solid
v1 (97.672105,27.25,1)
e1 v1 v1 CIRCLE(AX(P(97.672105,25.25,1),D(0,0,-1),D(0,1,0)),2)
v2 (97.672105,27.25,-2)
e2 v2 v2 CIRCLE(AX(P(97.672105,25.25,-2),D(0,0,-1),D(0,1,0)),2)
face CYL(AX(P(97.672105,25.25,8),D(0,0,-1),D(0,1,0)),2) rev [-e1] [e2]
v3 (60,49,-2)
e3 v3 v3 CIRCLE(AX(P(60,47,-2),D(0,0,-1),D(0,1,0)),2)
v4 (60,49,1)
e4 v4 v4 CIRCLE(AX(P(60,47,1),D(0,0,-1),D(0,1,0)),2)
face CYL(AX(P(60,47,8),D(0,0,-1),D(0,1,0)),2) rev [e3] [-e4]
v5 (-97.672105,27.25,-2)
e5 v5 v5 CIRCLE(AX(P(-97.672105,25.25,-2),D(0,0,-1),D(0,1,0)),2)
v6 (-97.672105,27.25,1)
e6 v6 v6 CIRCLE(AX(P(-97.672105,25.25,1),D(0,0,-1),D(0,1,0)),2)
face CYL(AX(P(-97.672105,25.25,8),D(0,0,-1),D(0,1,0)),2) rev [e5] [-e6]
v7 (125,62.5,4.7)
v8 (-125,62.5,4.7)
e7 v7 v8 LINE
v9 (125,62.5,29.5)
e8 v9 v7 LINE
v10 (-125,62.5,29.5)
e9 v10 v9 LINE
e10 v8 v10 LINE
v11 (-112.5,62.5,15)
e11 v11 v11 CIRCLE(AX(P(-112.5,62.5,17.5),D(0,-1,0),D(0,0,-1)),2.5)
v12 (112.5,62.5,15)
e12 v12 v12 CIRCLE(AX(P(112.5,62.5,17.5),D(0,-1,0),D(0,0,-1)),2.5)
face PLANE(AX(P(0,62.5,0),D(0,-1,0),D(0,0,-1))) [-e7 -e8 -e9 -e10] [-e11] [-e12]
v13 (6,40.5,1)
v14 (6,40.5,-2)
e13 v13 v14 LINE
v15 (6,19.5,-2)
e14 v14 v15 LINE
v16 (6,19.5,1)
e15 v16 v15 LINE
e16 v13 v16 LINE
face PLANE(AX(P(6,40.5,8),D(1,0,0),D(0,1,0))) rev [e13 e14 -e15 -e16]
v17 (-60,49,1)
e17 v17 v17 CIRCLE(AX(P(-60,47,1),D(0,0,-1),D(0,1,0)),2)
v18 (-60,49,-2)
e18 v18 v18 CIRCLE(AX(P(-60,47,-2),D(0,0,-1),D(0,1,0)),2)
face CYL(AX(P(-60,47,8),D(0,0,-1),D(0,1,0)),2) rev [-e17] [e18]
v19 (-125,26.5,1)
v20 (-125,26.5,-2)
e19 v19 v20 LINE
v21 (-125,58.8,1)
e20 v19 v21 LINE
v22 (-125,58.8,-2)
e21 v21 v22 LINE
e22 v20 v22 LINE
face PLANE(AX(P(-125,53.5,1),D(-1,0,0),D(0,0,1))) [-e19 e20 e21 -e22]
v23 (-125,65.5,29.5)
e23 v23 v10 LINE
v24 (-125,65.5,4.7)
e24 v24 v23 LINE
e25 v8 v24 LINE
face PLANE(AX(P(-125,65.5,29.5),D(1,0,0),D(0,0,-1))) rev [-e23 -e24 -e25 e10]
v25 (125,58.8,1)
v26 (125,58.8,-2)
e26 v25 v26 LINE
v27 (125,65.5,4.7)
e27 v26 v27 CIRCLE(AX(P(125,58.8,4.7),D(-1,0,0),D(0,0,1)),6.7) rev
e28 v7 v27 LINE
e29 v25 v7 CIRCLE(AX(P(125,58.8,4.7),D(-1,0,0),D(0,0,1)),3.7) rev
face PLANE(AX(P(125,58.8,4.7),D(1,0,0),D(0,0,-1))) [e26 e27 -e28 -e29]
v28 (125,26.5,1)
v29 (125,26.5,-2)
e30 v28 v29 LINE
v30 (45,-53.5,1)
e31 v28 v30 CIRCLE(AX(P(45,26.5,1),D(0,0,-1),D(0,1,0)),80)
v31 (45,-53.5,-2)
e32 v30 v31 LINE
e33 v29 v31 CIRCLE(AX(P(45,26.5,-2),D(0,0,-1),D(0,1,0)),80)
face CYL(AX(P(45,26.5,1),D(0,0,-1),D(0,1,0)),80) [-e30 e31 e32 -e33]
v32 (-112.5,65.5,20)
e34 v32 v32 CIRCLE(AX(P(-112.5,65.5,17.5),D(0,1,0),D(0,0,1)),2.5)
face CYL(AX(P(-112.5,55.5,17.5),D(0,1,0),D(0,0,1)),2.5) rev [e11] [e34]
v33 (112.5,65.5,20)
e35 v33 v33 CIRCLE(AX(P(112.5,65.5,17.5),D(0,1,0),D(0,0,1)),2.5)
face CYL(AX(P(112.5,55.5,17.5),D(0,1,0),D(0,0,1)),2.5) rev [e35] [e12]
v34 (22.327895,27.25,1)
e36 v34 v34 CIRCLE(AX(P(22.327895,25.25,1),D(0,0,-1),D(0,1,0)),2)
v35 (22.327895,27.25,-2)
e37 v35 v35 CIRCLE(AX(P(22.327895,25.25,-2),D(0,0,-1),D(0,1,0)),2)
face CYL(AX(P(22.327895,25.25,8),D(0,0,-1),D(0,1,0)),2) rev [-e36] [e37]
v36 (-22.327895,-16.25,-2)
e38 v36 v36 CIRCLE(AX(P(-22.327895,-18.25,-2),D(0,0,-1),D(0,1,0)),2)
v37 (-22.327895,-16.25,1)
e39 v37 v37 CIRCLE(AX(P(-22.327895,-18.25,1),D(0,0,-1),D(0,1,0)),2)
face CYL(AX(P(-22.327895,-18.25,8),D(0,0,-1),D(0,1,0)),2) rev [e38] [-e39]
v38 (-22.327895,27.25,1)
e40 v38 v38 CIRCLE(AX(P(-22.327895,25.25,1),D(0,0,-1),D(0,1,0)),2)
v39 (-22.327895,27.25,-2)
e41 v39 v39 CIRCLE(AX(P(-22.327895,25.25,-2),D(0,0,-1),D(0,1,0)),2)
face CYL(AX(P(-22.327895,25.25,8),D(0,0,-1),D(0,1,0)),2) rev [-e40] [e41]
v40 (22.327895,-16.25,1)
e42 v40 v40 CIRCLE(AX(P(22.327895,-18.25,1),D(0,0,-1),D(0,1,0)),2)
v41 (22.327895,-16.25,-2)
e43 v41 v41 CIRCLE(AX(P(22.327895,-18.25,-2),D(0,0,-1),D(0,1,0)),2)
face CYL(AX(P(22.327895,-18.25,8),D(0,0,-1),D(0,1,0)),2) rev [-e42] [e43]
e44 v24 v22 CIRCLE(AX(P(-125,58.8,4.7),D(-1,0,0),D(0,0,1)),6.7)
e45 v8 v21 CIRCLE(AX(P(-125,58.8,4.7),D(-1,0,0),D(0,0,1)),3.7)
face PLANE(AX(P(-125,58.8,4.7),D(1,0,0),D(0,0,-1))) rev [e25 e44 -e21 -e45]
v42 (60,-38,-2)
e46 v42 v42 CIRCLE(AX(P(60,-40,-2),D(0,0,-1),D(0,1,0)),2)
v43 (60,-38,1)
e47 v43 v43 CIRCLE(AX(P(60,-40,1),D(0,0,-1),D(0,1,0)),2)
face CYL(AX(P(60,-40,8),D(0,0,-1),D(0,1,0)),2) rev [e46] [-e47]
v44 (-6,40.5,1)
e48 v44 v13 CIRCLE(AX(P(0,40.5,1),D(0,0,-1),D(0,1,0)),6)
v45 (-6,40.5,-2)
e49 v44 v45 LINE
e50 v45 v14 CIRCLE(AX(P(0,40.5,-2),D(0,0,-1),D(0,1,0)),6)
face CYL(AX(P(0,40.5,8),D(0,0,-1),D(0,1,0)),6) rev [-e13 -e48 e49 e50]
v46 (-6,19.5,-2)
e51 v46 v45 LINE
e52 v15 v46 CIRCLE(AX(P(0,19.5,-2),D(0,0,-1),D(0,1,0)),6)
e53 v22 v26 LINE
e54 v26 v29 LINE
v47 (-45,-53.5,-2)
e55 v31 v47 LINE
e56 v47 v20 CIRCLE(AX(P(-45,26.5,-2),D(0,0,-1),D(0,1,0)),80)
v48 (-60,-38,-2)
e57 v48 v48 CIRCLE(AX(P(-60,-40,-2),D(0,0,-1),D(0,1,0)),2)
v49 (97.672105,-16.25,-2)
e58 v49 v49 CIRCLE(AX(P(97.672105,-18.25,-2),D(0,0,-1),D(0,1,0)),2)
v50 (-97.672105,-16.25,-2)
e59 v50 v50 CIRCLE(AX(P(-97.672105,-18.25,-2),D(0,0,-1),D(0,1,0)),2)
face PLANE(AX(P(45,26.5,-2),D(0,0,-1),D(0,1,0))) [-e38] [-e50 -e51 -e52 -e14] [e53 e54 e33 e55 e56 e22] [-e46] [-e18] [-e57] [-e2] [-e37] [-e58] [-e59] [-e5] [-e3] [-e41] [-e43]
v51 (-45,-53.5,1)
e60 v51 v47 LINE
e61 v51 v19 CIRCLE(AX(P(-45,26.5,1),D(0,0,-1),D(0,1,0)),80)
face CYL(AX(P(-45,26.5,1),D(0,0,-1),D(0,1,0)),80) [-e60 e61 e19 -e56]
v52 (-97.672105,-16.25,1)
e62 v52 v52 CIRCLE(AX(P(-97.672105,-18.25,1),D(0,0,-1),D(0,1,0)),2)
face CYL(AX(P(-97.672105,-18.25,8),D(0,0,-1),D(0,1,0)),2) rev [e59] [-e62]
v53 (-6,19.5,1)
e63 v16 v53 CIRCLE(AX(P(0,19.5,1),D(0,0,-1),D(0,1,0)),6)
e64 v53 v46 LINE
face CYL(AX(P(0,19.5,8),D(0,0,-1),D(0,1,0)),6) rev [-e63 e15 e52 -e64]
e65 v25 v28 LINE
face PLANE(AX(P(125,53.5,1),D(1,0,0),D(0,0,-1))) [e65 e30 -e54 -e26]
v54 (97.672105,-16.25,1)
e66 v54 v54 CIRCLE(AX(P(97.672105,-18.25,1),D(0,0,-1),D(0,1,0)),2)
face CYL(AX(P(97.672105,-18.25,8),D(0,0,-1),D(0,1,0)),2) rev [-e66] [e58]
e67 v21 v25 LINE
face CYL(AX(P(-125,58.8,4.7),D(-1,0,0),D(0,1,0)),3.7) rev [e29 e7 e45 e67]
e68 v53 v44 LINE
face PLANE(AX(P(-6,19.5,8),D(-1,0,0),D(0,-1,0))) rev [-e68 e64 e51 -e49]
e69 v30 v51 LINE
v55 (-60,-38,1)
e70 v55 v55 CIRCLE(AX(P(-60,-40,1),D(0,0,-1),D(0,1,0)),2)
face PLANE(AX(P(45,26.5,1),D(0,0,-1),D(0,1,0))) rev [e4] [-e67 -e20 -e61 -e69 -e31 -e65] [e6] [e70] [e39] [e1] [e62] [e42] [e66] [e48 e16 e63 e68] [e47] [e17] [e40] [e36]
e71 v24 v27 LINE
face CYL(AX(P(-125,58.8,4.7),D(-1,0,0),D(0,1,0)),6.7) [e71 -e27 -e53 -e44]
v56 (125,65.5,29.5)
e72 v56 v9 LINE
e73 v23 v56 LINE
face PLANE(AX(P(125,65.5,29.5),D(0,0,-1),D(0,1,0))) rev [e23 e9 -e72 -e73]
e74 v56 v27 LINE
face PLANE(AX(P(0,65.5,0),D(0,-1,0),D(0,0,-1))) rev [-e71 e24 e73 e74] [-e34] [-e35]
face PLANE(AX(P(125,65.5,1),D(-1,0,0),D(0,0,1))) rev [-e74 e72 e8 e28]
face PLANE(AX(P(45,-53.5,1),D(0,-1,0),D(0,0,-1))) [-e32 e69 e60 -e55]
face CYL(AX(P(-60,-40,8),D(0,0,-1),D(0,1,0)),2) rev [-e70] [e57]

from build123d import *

# Parameters (mm, degrees)
BOSS_EXTRUDE1_DEPTH          = 125
SKETCH2_R                    = 2
CUT_EXTRUDE1_DEPTH           = 144.165114466
FILLET1_R                    = 80
SKETCH3_R                    = 2.5
CUT_EXTRUDE2_DEPTH           = 10
CUT_EXTRUDE3_DEPTH           = 10
BASE_FLANGE1_START           = -3
BASE_FLANGE1_DEPTH           = 3
EDGE_FLANGE1_STRIP_W         = 19.4
EDGE_FLANGE1_STRIP_H         = 3
EDGE_FLANGE1_STRIP_CUT_DEPTH = 250
EDGE_FLANGE1_DEPTH           = 250
SKETCH13_R                   = 2
CUT_EXTRUDE4_DEPTH           = 10
SKETCH14_R                   = 2.5
CUT_EXTRUDE5_DEPTH           = 10


# Read off the part's stored shape, not the designer's step: Base-Flange1
# Sheet-metal steps are written as plain solids
with BuildPart() as part:
    # Sketch1 → Boss-Extrude1 (new, symmetric)
    with BuildSketch(Plane(origin=(0, 0, 0), x_dir=(0, 0, -1), z_dir=(1, 0, 0))):
        with BuildLine():
            Line((-31, 61.5), (-6, 61.5))
            ThreePointArc((-6, 61.5), (-0.343145751, 59.156854249), (2, 53.5))
            Line((2, 53.5), (2, -53.5))
            Line((2, -53.5), (-2, -53.5))
            Line((-2, -53.5), (-2, 53.5))
            ThreePointArc((-2, 53.5), (-3.171572875, 56.328427125), (-6, 57.5))
            Line((-6, 57.5), (-31, 57.5))
            Line((-31, 57.5), (-31, 61.5))
        make_face()
    extrude(amount=BOSS_EXTRUDE1_DEPTH, both=True)

    # Sketch2 → Cut-Extrude1 (cut, through all)
    with BuildSketch(Plane(origin=(0, 0, -2), x_dir=(-1, 0, 0), z_dir=(0, 0, -1))):
        with Locations(Location((60, 47, 0), (0, 0, 90))):
            Circle(SKETCH2_R)
        with Locations(Location((97.672105065, 25.25, 0), (0, 0, 90))):
            Circle(SKETCH2_R)
        with Locations(Location((97.672105065, -18.25, 0), (0, 0, 90))):
            Circle(SKETCH2_R)
        with Locations(Location((60, -40, 0), (0, 0, 90))):
            Circle(SKETCH2_R)
        with Locations(Location((22.327894935, -18.25, 0), (0, 0, 90))):
            Circle(SKETCH2_R)
        with Locations(Location((22.327894935, 25.25, 0), (0, 0, 90))):
            Circle(SKETCH2_R)
        with Locations(Location((-22.327894935, 25.25, 0), (0, 0, 90))):
            Circle(SKETCH2_R)
        with Locations(Location((-22.327894935, -18.25, 0), (0, 0, 90))):
            Circle(SKETCH2_R)
        with Locations(Location((-60, -40, 0), (0, 0, 90))):
            Circle(SKETCH2_R)
        with Locations(Location((-97.672105065, -18.25, 0), (0, 0, 90))):
            Circle(SKETCH2_R)
        with Locations(Location((-97.672105065, 25.25, 0), (0, 0, 90))):
            Circle(SKETCH2_R)
        with Locations(Location((-60, 47, 0), (0, 0, 90))):
            Circle(SKETCH2_R)
    extrude(amount=-CUT_EXTRUDE1_DEPTH, mode=Mode.SUBTRACT)

    # Fillet1
    fillet1_edges = [part.edges().sort_by_distance(p)[0] for p in [
        (125, -53.5, 0),
        (-125, -53.5, 0),
    ]]
    fillet(fillet1_edges, radius=FILLET1_R)

    # Sketch3 → Cut-Extrude2 (cut)
    with BuildSketch(Plane(origin=(0, 61.5, 0), x_dir=(1, 0, 0), z_dir=(0, 1, 0))):
        with Locations(Location((-112.5, -18.5, 0), (0, 0, 270))):
            Circle(SKETCH3_R)
        with Locations(Location((112.5, -18.5, 0), (0, 0, 270))):
            Circle(SKETCH3_R)
    extrude(amount=-CUT_EXTRUDE2_DEPTH, mode=Mode.SUBTRACT)

    # Sketch4 → Cut-Extrude3 (cut)
    with BuildSketch(Plane(origin=(0, 0, -2), x_dir=(-1, 0, 0), z_dir=(0, 0, -1))):
        with BuildLine():
            Line((6, 40.5), (6, 19.5))
            ThreePointArc((6, 19.5), (0, 13.5), (-6, 19.5))
            Line((-6, 19.5), (-6, 40.5))
            ThreePointArc((-6, 40.5), (0, 46.5), (6, 40.5))
        make_face()
    extrude(amount=-CUT_EXTRUDE3_DEPTH, mode=Mode.SUBTRACT)


with BuildPart() as body_2:
    # Base-Flange1 outline → Base-Flange1 (new body)
    with BuildSketch(Plane(origin=(0, 0, -2), x_dir=(-1, 0, 0), z_dir=(0, 0, -1)).offset(BASE_FLANGE1_START)):
        with BuildLine():
            Line((125, 65.5), (-125, 65.5))
            Line((-125, 65.5), (-125, 26.5))
            ThreePointArc((-125, 26.5), (-101.568542495, -30.068542495), (-45, -53.5))
            Line((-45, -53.5), (45, -53.5))
            ThreePointArc((45, -53.5), (101.568542495, -30.068542495), (125, 26.5))
            Line((125, 26.5), (125, 65.5))
        make_face()
    extrude(amount=BASE_FLANGE1_DEPTH)

    # Edge-Flange1 strip (across the edge) → Edge-Flange1 strip cut (cut)
    with BuildSketch(Plane(origin=(125, 65.5, 1), x_dir=(0, -1, 0), z_dir=(-1, 0, 0))):
        with Locations((-3, -1.5)):
            Rectangle(EDGE_FLANGE1_STRIP_W, EDGE_FLANGE1_STRIP_H)
    extrude(amount=EDGE_FLANGE1_STRIP_CUT_DEPTH, mode=Mode.SUBTRACT)

    # Edge-Flange1 section (across the edge) → Edge-Flange1 (add)
    with BuildSketch(Plane(origin=(125, 65.5, 1), x_dir=(0, -1, 0), z_dir=(-1, 0, 0))):
        with BuildLine():
            Line((0, 3.7), (0, 28.5))
            Line((0, 28.5), (3, 28.5))
            Line((3, 28.5), (3, 3.7))
            ThreePointArc((3, 3.7), (4.08370491, 1.08370491), (6.7, 0))
            Line((6.7, 0), (6.7, -3))
            ThreePointArc((6.7, -3), (1.962384566, -1.037615434), (0, 3.7))
        make_face()
    extrude(amount=EDGE_FLANGE1_DEPTH)

    # Sketch13 → Cut-Extrude4 (cut)
    with BuildSketch(Plane(origin=(0, 0, -2), x_dir=(-1, 0, 0), z_dir=(0, 0, -1))):
        with Locations(Location((97.672105065, -18.25, 0), (0, 0, 90))):
            Circle(SKETCH13_R)
        with Locations(Location((97.672105065, 25.25, 0), (0, 0, 90))):
            Circle(SKETCH13_R)
        with Locations(Location((60, 47, 0), (0, 0, 90))):
            Circle(SKETCH13_R)
        with Locations(Location((-97.672105065, -18.25, 0), (0, 0, 90))):
            Circle(SKETCH13_R)
        with Locations(Location((-60, -40, 0), (0, 0, 90))):
            Circle(SKETCH13_R)
        with Locations(Location((-22.327894935, -18.25, 0), (0, 0, 90))):
            Circle(SKETCH13_R)
        with Locations(Location((-22.327894935, 25.25, 0), (0, 0, 90))):
            Circle(SKETCH13_R)
        with Locations(Location((22.327894935, 25.25, 0), (0, 0, 90))):
            Circle(SKETCH13_R)
        with Locations(Location((22.327894935, -18.25, 0), (0, 0, 90))):
            Circle(SKETCH13_R)
        with Locations(Location((60, -40, 0), (0, 0, 90))):
            Circle(SKETCH13_R)
        with Locations(Location((-60, 47, 0), (0, 0, 90))):
            Circle(SKETCH13_R)
        with Locations(Location((-97.672105065, 25.25, 0), (0, 0, 90))):
            Circle(SKETCH13_R)
        with BuildLine():
            Line((6, 19.5), (6, 40.5))
            ThreePointArc((6, 40.5), (0, 46.5), (-6, 40.5))
            Line((-6, 40.5), (-6, 19.5))
            ThreePointArc((-6, 19.5), (0, 13.5), (6, 19.5))
        make_face()
    extrude(amount=-CUT_EXTRUDE4_DEPTH, mode=Mode.SUBTRACT)

    # Sketch14 → Cut-Extrude5 (cut)
    with BuildSketch(Plane(origin=(0, 65.5, 0), x_dir=(1, 0, 0), z_dir=(0, 1, 0))):
        with Locations(Location((-112.5, -17.5, 0), (0, 0, 270))):
            Circle(SKETCH14_R)
        with Locations(Location((112.5, -17.5, 0), (0, 0, 270))):
            Circle(SKETCH14_R)
    extrude(amount=-CUT_EXTRUDE5_DEPTH, mode=Mode.SUBTRACT)


solid = body_2.part
